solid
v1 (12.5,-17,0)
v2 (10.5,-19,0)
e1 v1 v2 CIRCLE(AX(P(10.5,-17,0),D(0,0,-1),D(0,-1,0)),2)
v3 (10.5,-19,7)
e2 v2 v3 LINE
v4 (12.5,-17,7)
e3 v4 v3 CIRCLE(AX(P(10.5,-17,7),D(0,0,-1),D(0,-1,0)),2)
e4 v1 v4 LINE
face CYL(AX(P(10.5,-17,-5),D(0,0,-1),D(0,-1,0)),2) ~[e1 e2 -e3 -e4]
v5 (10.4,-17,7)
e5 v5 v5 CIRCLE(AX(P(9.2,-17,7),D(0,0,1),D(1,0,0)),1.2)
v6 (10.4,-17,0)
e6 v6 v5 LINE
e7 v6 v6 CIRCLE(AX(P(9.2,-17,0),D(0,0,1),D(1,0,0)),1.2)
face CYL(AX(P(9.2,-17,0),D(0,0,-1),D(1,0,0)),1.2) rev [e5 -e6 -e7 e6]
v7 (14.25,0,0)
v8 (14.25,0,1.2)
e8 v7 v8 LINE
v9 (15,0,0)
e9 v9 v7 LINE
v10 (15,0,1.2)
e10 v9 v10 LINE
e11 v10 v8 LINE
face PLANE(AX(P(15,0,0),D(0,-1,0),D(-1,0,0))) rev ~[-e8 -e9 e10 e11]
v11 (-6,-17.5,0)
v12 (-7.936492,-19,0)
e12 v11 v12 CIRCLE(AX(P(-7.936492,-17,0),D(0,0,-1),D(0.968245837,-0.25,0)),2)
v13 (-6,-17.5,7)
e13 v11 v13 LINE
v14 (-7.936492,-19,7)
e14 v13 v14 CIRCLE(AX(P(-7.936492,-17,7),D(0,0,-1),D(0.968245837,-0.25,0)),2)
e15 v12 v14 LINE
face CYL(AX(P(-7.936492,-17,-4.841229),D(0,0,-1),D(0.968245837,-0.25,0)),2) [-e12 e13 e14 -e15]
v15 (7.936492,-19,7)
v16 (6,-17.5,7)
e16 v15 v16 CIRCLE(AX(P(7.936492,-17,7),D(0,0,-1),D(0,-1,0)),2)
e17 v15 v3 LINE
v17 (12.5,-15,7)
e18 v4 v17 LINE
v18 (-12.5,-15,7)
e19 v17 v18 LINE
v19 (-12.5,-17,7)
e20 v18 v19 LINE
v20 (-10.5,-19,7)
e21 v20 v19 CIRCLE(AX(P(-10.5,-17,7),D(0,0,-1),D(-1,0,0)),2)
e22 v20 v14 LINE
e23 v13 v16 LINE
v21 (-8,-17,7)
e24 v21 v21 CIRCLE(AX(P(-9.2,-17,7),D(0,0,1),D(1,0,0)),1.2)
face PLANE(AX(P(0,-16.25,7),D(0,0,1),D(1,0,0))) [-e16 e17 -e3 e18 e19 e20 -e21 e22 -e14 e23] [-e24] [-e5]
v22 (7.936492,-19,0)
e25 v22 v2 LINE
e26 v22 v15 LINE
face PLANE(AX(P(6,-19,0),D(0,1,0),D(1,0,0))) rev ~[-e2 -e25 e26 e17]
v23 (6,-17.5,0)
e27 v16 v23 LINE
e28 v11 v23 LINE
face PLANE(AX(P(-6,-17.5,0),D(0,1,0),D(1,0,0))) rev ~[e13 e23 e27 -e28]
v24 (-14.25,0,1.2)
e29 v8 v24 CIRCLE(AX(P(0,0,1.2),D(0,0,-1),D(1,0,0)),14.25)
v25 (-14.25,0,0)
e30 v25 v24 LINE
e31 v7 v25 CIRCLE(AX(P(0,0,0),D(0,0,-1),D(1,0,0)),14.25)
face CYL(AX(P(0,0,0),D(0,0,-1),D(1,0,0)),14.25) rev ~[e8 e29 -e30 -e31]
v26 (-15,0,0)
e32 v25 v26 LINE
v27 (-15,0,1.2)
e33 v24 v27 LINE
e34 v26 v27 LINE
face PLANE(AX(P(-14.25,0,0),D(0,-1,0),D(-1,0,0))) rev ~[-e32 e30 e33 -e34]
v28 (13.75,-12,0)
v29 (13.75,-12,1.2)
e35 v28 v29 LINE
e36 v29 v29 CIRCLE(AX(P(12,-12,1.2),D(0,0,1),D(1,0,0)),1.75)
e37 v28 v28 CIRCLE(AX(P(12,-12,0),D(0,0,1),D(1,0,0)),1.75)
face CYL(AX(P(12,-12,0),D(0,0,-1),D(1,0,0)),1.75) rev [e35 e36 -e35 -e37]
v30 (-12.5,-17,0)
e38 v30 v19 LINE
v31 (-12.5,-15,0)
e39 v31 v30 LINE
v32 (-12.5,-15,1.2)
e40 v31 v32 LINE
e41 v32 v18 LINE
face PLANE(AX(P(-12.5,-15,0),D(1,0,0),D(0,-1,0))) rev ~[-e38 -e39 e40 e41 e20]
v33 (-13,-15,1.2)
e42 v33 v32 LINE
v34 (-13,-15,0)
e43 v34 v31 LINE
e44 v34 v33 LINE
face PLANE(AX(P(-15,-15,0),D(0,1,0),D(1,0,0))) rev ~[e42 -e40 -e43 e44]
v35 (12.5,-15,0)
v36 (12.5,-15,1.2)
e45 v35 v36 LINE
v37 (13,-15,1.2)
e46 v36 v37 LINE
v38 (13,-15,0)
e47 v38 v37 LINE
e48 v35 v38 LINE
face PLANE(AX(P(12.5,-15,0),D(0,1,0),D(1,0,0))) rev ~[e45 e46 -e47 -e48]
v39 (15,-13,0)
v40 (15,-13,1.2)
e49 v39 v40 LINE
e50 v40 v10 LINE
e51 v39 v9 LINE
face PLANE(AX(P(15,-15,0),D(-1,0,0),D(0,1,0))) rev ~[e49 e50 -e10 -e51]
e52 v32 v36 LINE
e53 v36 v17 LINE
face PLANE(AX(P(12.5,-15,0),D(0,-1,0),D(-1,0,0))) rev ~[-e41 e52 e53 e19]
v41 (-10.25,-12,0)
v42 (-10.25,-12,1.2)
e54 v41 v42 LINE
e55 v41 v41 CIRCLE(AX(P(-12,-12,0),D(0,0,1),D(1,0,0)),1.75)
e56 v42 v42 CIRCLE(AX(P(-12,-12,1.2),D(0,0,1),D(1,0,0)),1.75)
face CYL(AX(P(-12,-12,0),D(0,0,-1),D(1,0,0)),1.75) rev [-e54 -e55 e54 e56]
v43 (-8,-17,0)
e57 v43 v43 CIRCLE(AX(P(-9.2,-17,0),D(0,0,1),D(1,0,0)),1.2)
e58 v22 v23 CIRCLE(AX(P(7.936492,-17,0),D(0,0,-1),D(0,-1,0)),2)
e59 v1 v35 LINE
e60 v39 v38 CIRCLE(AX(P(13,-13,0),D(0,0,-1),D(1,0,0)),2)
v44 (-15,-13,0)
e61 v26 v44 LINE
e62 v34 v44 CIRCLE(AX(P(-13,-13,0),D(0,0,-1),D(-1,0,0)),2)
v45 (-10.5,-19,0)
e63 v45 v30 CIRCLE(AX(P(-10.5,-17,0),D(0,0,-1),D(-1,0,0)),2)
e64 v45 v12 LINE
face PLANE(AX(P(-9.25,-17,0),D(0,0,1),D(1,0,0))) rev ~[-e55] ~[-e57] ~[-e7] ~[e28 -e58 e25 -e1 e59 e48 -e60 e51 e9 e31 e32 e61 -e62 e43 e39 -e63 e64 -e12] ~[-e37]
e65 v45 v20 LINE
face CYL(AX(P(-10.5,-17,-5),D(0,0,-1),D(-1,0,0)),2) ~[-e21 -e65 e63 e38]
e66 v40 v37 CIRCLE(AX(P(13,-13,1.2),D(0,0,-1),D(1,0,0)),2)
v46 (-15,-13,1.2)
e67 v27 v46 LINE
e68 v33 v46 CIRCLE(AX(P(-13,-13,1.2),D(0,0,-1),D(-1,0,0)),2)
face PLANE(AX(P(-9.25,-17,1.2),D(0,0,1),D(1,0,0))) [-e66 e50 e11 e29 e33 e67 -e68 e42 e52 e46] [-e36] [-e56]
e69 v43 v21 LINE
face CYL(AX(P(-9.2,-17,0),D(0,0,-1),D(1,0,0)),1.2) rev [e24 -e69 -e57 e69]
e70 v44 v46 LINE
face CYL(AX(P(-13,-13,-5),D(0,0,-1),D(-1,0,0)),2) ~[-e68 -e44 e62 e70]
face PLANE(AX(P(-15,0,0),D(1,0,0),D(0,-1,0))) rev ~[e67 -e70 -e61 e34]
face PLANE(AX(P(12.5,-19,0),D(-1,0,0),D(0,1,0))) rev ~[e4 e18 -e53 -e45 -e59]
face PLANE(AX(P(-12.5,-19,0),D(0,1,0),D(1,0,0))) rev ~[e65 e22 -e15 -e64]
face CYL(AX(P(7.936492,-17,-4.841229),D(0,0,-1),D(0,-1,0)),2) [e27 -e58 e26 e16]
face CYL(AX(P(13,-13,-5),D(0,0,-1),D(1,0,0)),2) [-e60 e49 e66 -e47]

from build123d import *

# Parameters (mm, degrees)
F0_R        = 1.2
F0_W        = 12
F0_H        = 2.5
F0_R_2      = 1.75
F1_DEPTH    = 1.2
F2_DEPTH    = 7
F3_T1_DEPTH = 17
F3_T3_DEPTH = 16.6824583655
F3_T5_DEPTH = 11.2


# Not quite as in the source:
# - a fillet or chamfer that OpenCascade refuses, or shapes differently, is made with other operations: its cross-section is extruded or revolved along the edge and cut away or added
# - a feature names something its author has since deleted; it is built from what else it names


with BuildPart() as f1:
    # F0 (on Top) → F1 (new body)
    with BuildSketch(Plane.XY):
        Polygon((-6, -17.5), (-6, -15), (-12.5, -15), (-12.5, -19), (-6, -19), align=None)
        with Locations((-9.2, -17)):
            Circle(F0_R, mode=Mode.SUBTRACT)
        with Locations((0, -16.25)):
            Rectangle(F0_W, F0_H)
        Polygon((12.5, -19), (12.5, -15), (6, -15), (6, -17.5), (6, -19), align=None)
        with Locations((9.2, -17)):
            Circle(F0_R, mode=Mode.SUBTRACT)
        with BuildLine():
            Line((12.5, -15), (15, -15))
            Line((15, -15), (15, 0))
            Line((15, 0), (14.25, 0))
            ThreePointArc((14.25, 0), (0, -14.25), (-14.25, 0))
            Line((-14.25, 0), (-15, 0))
            Line((-15, 0), (-15, -15))
            Line((-15, -15), (-12.5, -15))
            Line((-12.5, -15), (-6, -15))
            Line((-6, -15), (6, -15))
            Line((6, -15), (12.5, -15))
        make_face()
        with Locations((-12, -12)):
            Circle(F0_R_2, mode=Mode.SUBTRACT)
        with Locations((12, -12)):
            Circle(F0_R_2, mode=Mode.SUBTRACT)
    extrude(amount=F1_DEPTH)

    # F0 (on Top) → F2 (join)
    with BuildSketch(Plane.XY):
        with Locations((0, -16.25)):
            Rectangle(F0_W, F0_H)
        Polygon((-6, -17.5), (-6, -15), (-12.5, -15), (-12.5, -19), (-6, -19), align=None)
        with Locations((-9.2, -17)):
            Circle(F0_R, mode=Mode.SUBTRACT)
        Polygon((12.5, -19), (12.5, -15), (6, -15), (6, -17.5), (6, -19), align=None)
        with Locations((9.2, -17)):
            Circle(F0_R, mode=Mode.SUBTRACT)
    extrude(amount=F2_DEPTH)

    # F3: fillet of radius 2 on 6 edges, made by hand

    # F3_s2 → F3_t1 (cut)
    with BuildSketch(Plane.XY.offset(-5)):
        with BuildLine():
            ThreePointArc((-12.5, -17), (-11.9142135624, -18.4142135624), (-10.5, -19))
            Line((-10.5, -19), (-12.5, -19))
            Line((-12.5, -19), (-12.5, -17))
        make_face()
        with BuildLine():
            ThreePointArc((10.5, -19), (11.9142135624, -18.4142135624), (12.5, -17))
            Line((12.5, -17), (12.5, -19))
            Line((12.5, -19), (10.5, -19))
        make_face()
    extrude(amount=F3_T1_DEPTH, mode=Mode.SUBTRACT)

    # F3_s4 → F3_t3 (cut)
    with BuildSketch(Plane.XY.offset(-4.8412291828)):
        with BuildLine():
            ThreePointArc((-6, -17.5), (-6.7117468017, -18.5811388301), (-7.9364916731, -19))
            Line((-7.9364916731, -19), (-6, -19))
            Line((-6, -19), (-6, -17.5))
        make_face()
        with BuildLine():
            ThreePointArc((7.9364916731, -19), (6.7117468017, -18.5811388301), (6, -17.5))
            Line((6, -17.5), (6, -19))
            Line((6, -19), (7.9364916731, -19))
        make_face()
    extrude(amount=F3_T3_DEPTH, mode=Mode.SUBTRACT)

    # F3_s6 → F3_t5 (cut)
    with BuildSketch(Plane.XY.offset(-5)):
        with BuildLine():
            ThreePointArc((15, -13), (14.4142135624, -14.4142135624), (13, -15))
            Line((13, -15), (15, -15))
            Line((15, -15), (15, -13))
        make_face()
        with BuildLine():
            ThreePointArc((-15, -13), (-14.4142135624, -14.4142135624), (-13, -15))
            Line((-13, -15), (-15, -15))
            Line((-15, -15), (-15, -13))
        make_face()
    extrude(amount=F3_T5_DEPTH, mode=Mode.SUBTRACT)


solid = f1.part
